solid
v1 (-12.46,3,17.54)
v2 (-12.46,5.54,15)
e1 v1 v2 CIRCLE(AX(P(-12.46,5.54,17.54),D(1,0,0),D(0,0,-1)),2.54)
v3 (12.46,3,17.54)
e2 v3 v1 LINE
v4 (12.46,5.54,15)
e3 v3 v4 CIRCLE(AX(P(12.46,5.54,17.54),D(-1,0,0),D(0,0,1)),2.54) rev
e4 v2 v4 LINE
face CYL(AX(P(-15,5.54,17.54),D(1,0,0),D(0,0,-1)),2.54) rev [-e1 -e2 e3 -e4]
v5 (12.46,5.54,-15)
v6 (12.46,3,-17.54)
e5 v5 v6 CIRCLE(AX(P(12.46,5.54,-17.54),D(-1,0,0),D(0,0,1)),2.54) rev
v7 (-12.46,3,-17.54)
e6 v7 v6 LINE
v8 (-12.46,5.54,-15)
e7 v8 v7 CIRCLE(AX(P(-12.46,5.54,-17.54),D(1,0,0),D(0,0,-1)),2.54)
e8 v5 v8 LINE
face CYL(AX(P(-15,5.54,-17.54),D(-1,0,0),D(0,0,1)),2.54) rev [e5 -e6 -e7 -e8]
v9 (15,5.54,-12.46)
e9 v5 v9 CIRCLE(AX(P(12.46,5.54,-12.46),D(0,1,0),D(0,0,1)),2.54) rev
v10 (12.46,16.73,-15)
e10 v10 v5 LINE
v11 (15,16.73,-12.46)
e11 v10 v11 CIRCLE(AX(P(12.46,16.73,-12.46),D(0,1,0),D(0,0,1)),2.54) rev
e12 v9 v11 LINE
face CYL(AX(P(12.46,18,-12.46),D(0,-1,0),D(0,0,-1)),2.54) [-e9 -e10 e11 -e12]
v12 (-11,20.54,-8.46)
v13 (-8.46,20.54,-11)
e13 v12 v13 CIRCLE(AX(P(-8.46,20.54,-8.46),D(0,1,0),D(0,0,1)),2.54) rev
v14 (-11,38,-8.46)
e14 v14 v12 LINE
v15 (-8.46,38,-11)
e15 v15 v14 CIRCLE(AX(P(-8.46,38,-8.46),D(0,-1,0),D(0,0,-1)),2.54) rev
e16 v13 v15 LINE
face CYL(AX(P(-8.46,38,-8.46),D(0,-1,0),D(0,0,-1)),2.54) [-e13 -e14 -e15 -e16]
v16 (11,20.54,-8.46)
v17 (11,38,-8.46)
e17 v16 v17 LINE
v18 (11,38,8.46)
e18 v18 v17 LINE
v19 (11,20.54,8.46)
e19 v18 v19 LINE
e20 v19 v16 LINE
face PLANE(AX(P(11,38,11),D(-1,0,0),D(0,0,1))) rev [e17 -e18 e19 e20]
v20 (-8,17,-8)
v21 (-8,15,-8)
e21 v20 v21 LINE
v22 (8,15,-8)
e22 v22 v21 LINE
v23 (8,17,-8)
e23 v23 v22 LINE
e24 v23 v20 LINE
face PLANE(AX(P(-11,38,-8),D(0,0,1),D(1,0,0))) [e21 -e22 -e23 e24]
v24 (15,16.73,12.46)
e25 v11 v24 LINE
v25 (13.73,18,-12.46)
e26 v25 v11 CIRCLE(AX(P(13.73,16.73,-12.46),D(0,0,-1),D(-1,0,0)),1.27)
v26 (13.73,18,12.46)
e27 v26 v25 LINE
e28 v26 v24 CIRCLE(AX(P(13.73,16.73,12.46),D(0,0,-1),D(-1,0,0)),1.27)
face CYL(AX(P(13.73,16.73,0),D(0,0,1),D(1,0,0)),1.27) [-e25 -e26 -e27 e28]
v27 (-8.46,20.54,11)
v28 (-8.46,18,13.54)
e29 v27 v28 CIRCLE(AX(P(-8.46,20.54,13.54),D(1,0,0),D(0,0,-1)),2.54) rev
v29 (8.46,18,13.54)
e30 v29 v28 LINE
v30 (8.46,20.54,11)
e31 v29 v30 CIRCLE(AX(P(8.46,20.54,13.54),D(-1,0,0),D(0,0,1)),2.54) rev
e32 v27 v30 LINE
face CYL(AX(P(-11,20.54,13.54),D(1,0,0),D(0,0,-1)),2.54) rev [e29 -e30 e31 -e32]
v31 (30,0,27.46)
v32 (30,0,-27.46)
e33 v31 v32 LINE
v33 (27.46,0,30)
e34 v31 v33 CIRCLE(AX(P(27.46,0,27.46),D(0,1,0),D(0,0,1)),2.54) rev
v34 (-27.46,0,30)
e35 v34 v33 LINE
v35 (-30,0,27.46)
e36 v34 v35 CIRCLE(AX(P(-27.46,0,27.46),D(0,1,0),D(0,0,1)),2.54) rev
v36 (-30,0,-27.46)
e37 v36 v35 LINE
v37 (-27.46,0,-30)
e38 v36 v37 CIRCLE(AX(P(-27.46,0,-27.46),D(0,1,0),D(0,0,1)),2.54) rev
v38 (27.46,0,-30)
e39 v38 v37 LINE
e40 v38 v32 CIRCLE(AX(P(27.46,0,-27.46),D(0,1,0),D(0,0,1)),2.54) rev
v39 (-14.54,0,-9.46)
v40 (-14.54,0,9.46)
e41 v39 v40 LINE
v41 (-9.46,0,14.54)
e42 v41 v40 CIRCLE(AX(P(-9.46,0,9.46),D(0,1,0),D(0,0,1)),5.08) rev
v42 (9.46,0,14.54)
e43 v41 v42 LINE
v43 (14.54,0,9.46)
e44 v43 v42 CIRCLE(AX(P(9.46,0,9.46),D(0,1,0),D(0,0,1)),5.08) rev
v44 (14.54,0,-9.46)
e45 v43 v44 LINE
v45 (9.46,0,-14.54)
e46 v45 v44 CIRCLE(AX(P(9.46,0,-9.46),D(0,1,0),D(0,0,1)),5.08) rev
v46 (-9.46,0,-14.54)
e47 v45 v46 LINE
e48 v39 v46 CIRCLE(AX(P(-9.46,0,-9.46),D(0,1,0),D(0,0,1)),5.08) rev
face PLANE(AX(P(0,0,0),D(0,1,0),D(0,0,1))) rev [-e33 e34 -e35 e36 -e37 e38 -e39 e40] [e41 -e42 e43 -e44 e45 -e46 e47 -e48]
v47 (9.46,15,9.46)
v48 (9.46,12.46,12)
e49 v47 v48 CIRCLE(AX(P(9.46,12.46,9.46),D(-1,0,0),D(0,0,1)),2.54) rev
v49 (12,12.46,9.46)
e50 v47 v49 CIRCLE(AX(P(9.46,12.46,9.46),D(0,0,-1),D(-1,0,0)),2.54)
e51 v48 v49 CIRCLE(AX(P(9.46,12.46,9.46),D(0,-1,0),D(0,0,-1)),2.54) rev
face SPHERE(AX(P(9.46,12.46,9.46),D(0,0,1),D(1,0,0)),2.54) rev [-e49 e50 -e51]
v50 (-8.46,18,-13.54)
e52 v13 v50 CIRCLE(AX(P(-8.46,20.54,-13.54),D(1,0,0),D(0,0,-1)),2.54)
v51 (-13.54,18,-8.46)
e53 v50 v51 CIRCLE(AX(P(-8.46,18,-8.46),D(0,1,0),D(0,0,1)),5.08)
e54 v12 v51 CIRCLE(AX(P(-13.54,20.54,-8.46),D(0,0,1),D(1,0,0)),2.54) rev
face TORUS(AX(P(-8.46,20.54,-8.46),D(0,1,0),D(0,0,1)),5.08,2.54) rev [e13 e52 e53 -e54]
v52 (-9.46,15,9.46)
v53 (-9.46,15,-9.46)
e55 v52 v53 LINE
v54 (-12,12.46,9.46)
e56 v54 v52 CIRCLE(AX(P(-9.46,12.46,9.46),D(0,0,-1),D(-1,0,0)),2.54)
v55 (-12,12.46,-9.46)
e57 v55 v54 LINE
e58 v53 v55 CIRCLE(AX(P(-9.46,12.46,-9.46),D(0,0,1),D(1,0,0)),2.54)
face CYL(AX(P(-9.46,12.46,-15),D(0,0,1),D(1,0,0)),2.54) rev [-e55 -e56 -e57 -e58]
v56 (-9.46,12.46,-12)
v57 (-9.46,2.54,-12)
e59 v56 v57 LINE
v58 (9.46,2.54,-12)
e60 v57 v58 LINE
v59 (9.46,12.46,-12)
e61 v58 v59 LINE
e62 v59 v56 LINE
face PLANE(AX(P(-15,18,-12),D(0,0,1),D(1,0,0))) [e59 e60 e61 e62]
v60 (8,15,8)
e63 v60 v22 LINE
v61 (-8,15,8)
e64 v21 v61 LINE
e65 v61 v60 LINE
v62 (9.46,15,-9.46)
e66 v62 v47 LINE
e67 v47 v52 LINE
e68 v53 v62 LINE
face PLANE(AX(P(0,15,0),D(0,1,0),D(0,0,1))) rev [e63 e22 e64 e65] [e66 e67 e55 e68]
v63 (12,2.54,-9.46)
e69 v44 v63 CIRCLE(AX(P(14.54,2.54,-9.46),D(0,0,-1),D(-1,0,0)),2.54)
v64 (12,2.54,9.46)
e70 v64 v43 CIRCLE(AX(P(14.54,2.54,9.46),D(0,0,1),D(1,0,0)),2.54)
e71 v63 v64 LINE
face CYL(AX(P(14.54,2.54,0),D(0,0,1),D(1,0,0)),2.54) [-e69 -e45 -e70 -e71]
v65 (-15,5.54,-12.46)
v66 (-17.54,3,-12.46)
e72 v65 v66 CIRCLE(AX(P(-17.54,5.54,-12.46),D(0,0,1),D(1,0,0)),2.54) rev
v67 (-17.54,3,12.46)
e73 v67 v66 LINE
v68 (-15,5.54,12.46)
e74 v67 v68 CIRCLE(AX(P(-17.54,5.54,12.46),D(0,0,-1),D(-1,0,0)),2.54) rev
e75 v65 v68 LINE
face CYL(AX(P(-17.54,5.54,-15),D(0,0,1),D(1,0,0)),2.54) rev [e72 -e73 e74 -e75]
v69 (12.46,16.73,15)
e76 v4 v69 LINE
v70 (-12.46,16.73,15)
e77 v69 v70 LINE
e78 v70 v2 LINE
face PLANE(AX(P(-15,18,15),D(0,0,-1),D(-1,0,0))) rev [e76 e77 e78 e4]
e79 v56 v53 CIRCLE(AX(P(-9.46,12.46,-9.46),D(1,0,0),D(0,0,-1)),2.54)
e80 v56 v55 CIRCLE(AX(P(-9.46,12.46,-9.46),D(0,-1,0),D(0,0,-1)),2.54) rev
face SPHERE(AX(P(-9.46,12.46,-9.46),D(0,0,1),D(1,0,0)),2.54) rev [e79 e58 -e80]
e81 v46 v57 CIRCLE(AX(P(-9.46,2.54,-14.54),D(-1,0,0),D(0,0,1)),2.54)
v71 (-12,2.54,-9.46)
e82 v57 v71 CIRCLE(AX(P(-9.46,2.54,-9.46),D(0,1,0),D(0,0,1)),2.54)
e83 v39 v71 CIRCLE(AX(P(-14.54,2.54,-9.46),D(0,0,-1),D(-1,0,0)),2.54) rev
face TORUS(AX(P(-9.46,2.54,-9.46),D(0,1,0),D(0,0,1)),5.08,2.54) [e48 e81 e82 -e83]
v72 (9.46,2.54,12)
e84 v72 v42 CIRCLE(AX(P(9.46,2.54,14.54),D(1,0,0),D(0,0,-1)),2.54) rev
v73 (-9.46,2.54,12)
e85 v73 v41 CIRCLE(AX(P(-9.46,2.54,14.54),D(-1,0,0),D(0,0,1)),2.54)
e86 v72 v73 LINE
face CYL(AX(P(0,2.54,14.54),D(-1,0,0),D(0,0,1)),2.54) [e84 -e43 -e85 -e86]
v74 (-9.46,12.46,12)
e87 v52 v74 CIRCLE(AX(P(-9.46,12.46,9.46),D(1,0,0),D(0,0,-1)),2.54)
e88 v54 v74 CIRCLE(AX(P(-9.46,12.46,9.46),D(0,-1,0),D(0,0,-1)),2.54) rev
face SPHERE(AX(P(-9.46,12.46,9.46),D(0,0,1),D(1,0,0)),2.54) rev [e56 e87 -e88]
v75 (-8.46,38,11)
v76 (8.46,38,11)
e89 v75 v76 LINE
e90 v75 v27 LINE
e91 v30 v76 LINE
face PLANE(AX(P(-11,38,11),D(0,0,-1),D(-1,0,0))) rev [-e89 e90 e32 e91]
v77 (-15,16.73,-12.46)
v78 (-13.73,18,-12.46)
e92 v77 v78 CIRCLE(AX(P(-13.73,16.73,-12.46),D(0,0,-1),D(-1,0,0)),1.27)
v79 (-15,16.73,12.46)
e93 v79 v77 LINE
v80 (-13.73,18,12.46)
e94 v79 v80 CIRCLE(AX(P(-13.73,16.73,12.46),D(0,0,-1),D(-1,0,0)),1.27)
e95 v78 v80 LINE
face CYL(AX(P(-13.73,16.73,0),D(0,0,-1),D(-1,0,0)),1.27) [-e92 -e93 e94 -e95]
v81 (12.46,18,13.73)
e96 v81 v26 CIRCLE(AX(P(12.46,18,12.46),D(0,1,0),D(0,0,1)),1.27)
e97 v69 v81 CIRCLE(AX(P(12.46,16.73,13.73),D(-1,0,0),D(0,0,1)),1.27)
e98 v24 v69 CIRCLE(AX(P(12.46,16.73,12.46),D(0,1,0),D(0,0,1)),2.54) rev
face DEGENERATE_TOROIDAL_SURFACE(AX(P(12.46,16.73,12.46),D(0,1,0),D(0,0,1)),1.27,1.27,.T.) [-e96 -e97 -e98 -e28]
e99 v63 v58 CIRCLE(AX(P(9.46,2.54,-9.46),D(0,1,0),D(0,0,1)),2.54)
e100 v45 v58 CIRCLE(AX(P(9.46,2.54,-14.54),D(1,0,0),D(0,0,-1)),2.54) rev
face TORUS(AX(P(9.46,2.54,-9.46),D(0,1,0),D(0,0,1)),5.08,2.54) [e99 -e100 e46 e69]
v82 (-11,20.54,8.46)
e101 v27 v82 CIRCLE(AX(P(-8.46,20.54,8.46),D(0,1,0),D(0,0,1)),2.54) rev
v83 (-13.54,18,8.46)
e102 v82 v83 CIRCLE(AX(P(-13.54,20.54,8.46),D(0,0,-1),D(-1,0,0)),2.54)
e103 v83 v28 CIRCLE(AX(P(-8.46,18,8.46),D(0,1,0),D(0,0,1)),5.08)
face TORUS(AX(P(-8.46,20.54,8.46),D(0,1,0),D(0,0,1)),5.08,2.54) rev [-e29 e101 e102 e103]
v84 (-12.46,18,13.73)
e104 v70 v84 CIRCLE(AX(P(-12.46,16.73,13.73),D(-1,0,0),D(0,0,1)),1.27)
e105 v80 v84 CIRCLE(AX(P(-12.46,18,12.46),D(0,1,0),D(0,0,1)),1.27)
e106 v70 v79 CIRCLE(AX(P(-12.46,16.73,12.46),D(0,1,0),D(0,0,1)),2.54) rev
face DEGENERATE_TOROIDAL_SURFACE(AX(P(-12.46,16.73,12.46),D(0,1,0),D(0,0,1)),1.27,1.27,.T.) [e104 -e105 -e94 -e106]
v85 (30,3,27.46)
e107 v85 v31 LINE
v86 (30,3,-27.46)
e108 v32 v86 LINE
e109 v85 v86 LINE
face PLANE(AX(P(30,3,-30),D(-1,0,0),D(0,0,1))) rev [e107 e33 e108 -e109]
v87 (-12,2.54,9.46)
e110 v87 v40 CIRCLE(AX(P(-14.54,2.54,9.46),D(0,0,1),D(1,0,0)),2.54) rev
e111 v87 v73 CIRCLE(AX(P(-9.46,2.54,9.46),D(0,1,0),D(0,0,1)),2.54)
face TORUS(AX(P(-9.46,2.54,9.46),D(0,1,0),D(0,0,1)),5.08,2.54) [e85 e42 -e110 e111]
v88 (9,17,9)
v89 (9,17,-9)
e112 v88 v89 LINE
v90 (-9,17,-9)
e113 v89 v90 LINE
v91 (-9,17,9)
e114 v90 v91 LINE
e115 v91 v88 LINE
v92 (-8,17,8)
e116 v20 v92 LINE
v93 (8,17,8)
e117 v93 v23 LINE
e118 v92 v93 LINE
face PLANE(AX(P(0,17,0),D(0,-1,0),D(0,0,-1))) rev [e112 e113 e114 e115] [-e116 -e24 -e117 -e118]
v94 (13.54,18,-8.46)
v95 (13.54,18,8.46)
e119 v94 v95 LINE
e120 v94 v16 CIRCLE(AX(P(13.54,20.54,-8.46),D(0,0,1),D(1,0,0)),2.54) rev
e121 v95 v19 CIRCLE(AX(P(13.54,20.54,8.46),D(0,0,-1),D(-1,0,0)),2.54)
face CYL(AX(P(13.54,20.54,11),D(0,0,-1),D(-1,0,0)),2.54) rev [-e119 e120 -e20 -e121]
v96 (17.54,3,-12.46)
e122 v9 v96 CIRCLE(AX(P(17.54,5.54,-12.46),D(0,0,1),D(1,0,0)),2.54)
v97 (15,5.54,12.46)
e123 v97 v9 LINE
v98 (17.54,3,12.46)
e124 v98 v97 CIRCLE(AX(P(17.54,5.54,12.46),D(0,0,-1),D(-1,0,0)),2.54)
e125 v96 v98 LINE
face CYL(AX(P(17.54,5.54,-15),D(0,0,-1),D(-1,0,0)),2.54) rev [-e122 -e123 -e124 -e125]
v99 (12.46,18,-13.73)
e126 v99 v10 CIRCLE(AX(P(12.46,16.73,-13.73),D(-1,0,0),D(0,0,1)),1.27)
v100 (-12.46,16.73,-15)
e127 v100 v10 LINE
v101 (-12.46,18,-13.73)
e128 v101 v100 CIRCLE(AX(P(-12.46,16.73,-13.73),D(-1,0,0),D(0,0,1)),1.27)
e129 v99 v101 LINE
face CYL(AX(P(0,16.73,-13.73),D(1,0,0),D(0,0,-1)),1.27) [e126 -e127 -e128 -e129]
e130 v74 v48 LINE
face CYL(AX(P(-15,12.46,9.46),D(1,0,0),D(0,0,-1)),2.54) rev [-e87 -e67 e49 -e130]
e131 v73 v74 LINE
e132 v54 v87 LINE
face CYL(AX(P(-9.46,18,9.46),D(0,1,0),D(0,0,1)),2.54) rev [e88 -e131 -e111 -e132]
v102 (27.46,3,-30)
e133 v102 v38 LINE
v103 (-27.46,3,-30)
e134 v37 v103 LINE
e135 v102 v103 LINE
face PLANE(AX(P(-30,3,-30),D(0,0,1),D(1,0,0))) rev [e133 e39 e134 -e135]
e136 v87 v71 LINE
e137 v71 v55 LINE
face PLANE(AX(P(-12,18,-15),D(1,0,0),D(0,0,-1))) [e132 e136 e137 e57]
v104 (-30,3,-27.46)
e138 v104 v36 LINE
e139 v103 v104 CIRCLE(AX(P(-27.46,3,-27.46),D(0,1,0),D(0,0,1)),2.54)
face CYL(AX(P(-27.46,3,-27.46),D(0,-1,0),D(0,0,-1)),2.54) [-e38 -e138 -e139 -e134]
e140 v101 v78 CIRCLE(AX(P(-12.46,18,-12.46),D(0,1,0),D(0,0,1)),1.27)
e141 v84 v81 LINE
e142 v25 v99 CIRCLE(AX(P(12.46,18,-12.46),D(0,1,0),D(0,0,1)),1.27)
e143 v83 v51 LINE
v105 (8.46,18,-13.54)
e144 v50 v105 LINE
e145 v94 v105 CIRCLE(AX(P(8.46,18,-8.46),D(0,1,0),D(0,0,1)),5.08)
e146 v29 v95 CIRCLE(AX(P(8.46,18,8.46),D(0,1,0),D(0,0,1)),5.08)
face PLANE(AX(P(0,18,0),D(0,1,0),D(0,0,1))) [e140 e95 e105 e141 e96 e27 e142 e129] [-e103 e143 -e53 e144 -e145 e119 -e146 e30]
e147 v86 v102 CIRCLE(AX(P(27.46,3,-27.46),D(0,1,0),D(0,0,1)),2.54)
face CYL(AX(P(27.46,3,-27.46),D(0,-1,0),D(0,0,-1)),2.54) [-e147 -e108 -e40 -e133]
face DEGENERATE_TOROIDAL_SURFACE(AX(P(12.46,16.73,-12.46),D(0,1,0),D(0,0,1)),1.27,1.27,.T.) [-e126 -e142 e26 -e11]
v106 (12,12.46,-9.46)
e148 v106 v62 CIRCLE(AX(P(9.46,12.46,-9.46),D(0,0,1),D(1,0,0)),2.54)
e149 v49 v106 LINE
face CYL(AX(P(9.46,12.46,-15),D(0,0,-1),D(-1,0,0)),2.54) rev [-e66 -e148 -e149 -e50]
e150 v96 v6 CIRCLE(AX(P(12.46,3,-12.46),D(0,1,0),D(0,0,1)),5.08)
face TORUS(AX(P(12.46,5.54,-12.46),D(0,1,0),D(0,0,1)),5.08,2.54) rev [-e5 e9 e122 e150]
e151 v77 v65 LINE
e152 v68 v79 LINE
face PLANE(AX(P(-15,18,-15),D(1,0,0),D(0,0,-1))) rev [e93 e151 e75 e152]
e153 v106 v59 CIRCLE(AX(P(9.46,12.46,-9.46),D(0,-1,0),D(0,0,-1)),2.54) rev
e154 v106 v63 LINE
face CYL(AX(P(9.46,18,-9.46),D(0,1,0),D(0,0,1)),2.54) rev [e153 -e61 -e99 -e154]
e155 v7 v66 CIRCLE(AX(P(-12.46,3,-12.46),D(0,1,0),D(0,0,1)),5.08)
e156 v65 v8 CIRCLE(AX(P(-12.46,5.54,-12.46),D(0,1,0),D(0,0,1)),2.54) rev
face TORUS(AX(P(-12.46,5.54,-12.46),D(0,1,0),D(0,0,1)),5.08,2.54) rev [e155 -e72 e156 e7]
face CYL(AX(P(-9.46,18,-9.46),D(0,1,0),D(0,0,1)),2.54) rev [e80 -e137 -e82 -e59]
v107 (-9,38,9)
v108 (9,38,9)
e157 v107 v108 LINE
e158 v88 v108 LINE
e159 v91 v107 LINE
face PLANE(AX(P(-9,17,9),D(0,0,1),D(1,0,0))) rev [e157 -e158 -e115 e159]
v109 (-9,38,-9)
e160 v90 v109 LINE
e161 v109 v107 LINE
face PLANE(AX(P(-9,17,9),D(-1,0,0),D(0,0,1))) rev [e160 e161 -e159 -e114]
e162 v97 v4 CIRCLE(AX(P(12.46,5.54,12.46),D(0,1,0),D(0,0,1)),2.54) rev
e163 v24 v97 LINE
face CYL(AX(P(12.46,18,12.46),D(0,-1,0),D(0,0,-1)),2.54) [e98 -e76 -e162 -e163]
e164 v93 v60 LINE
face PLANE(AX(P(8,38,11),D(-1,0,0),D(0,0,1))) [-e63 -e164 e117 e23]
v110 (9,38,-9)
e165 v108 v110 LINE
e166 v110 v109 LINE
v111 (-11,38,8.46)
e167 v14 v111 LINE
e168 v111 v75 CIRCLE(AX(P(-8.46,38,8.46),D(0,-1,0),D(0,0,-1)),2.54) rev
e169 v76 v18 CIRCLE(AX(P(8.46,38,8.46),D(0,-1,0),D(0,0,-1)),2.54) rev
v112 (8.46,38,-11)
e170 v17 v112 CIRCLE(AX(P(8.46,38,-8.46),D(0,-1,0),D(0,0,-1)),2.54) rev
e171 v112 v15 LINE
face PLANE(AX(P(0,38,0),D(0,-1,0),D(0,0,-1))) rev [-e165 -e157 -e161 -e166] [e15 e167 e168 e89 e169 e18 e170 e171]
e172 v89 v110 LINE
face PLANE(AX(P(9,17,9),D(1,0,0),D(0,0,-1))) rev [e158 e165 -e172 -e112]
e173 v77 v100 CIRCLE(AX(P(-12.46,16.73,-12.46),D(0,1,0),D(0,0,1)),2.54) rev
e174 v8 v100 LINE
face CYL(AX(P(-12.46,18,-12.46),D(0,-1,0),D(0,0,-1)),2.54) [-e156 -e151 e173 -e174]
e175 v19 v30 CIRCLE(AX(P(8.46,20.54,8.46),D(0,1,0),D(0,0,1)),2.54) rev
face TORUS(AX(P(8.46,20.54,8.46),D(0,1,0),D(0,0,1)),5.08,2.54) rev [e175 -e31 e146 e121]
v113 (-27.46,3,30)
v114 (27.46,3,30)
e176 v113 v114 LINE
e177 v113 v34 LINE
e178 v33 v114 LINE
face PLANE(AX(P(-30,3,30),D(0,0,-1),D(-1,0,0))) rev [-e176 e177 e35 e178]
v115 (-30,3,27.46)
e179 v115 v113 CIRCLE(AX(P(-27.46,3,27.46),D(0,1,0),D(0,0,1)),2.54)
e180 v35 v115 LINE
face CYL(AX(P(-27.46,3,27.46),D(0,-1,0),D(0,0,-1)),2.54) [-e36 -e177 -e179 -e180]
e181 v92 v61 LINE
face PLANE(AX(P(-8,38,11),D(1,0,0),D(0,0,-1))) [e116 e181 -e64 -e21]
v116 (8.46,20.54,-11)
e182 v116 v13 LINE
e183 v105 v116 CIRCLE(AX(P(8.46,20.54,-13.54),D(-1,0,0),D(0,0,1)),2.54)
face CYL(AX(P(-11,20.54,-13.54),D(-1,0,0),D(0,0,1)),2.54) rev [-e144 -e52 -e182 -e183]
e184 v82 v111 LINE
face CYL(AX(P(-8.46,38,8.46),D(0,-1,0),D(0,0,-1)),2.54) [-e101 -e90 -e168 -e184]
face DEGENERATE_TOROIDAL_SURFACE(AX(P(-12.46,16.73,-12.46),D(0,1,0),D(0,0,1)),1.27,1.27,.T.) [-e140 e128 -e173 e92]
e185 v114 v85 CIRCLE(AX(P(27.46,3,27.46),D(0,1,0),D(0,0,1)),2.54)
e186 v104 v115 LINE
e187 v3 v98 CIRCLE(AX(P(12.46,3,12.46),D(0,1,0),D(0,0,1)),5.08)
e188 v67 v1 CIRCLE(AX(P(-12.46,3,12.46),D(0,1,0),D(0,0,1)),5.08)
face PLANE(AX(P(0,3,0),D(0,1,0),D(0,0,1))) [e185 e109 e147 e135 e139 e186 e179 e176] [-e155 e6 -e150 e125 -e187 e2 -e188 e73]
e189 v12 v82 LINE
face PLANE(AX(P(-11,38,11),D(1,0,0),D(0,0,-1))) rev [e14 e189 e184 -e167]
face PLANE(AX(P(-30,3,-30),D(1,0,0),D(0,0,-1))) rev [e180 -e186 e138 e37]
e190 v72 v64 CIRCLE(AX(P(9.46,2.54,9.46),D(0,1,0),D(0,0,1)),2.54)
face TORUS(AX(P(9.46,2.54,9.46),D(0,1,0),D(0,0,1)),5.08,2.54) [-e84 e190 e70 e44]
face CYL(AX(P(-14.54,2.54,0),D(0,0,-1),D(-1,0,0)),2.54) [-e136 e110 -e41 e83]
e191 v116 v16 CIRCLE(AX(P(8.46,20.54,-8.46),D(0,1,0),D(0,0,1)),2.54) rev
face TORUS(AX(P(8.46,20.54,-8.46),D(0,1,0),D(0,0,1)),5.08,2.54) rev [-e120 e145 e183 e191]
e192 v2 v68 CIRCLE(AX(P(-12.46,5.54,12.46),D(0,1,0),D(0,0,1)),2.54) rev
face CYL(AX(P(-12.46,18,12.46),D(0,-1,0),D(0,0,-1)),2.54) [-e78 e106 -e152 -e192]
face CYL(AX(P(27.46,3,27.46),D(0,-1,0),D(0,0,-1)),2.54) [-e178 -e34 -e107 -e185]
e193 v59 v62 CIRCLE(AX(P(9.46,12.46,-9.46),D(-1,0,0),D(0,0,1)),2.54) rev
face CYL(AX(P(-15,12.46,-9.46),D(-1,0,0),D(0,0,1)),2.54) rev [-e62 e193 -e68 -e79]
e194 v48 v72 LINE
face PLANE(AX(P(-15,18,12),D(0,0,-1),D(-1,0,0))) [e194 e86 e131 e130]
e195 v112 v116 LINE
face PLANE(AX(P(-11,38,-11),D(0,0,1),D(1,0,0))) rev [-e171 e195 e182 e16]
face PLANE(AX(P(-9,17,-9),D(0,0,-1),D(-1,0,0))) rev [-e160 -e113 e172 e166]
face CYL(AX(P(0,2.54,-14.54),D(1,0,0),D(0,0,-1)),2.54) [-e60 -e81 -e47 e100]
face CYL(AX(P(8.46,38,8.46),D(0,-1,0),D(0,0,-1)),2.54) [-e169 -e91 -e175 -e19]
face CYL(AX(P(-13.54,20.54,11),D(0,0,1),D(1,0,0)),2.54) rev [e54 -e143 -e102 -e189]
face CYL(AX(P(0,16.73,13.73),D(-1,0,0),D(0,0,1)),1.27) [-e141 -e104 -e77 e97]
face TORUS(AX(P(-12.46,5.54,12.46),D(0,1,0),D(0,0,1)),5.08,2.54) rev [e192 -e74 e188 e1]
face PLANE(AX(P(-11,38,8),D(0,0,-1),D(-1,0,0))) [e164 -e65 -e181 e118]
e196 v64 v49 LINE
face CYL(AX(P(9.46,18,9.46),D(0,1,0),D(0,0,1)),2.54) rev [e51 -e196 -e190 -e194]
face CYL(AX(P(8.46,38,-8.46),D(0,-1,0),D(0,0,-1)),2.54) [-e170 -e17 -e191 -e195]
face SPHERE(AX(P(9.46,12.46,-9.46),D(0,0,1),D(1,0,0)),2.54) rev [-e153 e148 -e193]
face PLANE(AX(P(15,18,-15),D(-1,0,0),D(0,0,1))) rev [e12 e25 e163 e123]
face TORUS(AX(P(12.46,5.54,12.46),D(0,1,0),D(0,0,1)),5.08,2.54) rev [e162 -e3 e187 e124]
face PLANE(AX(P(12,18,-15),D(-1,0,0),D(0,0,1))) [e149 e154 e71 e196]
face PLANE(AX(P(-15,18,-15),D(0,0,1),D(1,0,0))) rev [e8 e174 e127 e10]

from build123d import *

# Parameters (mm, degrees)
SKETCH1_W           = 60
SKETCH1_H           = 60
BOSS_EXTRUDE1_DEPTH = 3
SKETCH2_W           = 30
SKETCH2_H           = 30
BOSS_EXTRUDE2_DEPTH = 14.999999878
SKETCH3_W           = 22
SKETCH3_H           = 22
BOSS_EXTRUDE3_DEPTH = 19.999999944
SHELL1_START        = -8
SHELL1_DEPTH        = 16
SHELL1_START_2      = -12
SHELL1_2_OUTLINE_W  = 14.999999878
SHELL1_2_OUTLINE_H  = 24
SHELL1_2_DEPTH      = 24
SKETCH4_W           = 16
SKETCH4_H           = 16
CUT_EXTRUDE1_DEPTH  = 55.999999887
SKETCH5_W           = 18
SKETCH5_H           = 18
SKETCH5_W_2         = 16
SKETCH5_H_2         = 16
CUT_EXTRUDE2_DEPTH  = 21.000000066
FILLET2_R           = 2.54
FILLET3_R           = 2.54
FILLET4_R           = 1.27


# Read off the part's stored shape, not the designer's step: Shell1
with BuildPart() as part:
    # Sketch1 → Boss-Extrude1 (new body)
    with BuildSketch(Plane(origin=(0, 0, 0), x_dir=(1, 0, 0), z_dir=(0, 1, 0))):
        Rectangle(SKETCH1_W, SKETCH1_H)
    extrude(amount=BOSS_EXTRUDE1_DEPTH)

    # Sketch2 → Boss-Extrude2 (add)
    with BuildSketch(Plane(origin=(0, 3, 0), x_dir=(1, 0, 0), z_dir=(0, 1, 0))):
        Rectangle(SKETCH2_W, SKETCH2_H)
    extrude(amount=BOSS_EXTRUDE2_DEPTH)

    # Sketch3 → Boss-Extrude3 (add)
    with BuildSketch(Plane(origin=(0, 17.999999878, 0), x_dir=(1, 0, 0), z_dir=(0, 1, 0))):
        Rectangle(SKETCH3_W, SKETCH3_H)
    extrude(amount=BOSS_EXTRUDE3_DEPTH)

    # Shell1 outline → Shell1 (cut)
    with BuildSketch(Plane.YZ.offset(SHELL1_START)):
        Polygon((14.999999878, 12), (0, 12), (0, -12), (14.999999878, -12), (14.999999878, -8), (34.999999822, -8), (34.999999822, 8), (14.999999878, 8), align=None)
    extrude(amount=SHELL1_DEPTH, mode=Mode.SUBTRACT)

    # Shell1 2 outline → Shell1 2 (cut)
    with BuildSketch(Plane.YZ.offset(SHELL1_START_2)):
        with Locations((7.499999939, 0)):
            Rectangle(SHELL1_2_OUTLINE_W, SHELL1_2_OUTLINE_H)
    extrude(amount=SHELL1_2_DEPTH, mode=Mode.SUBTRACT)

    # Sketch4 → Cut-Extrude1 (cut, through all)
    with BuildSketch(Plane.XZ.offset(-34.999999822)):
        Rectangle(SKETCH4_W, SKETCH4_H)
    extrude(amount=-CUT_EXTRUDE1_DEPTH, mode=Mode.SUBTRACT)

    # Sketch5 → Cut-Extrude2 (cut)
    with BuildSketch(Plane(origin=(0, 37.999999822, 0), x_dir=(1, 0, 0), z_dir=(0, 1, 0))):
        Rectangle(SKETCH5_W, SKETCH5_H)
        Rectangle(SKETCH5_W_2, SKETCH5_H_2, mode=Mode.SUBTRACT)
    extrude(amount=-CUT_EXTRUDE2_DEPTH, mode=Mode.SUBTRACT)

    # Fillet2
    fillet2_edges = [part.edges().sort_by_distance(p)[0] for p in [
        (-12, 0, 0),
        (-12, 7.499999939, -12),
        (0, 0, 12),
        (-12, 7.499999939, 12),
        (12, 0, 0),
        (12, 7.499999939, 12),
        (0, 0, -12),
        (12, 7.499999939, -12),
        (-12, 14.999999878, 0),
        (0, 14.999999878, 12),
        (12, 14.999999878, 0),
        (0, 14.999999878, -12),
    ]]
    fillet(fillet2_edges, radius=FILLET2_R)

    # Fillet3
    fillet3_edges = [part.edges().sort_by_distance(p)[0] for p in [
        (-15, 10.499999939, -15),
        (-15, 10.499999939, 15),
        (15, 10.499999939, 15),
        (15, 10.499999939, -15),
        (-11, 27.99999985, -11),
        (-11, 27.99999985, 11),
        (11, 27.99999985, 11),
        (11, 27.99999985, -11),
        (-30, 1.5, -30),
        (30, 1.5, -30),
        (30, 1.5, 30),
        (-30, 1.5, 30),
    ]]
    fillet(fillet3_edges, radius=FILLET3_R)
    fillet3_2_edges = [part.edges().sort_by_distance(p)[0] for p in [
        (-15, 3, 0),
        (0, 3, 15),
        (15, 3, 0),
        (0, 3, -15),
        (-11, 17.999999878, 0),
        (0, 17.999999878, 11),
        (11, 17.999999878, 0),
        (0, 17.999999878, -11),
        (10.256051224, 17.999999878, -10.256051224),
        (-10.256051224, 17.999999878, -10.256051224),
        (10.256051224, 17.999999878, 10.256051224),
        (-10.256051224, 17.999999878, 10.256051224),
        (-14.256051224, 3, -14.256051224),
        (14.256051224, 3, -14.256051224),
        (14.256051224, 3, 14.256051224),
        (-14.256051224, 3, 14.256051224),
    ]]
    fillet(fillet3_2_edges, radius=FILLET3_R)

    # Fillet4
    fillet4_edges = [part.edges().sort_by_distance(p)[0] for p in [
        (-15, 17.999999878, 0),
        (0, 17.999999878, 15),
        (15, 17.999999878, 0),
        (0, 17.999999878, -15),
        (-14.256051224, 17.999999878, -14.256051224),
        (-14.256051224, 17.999999878, 14.256051224),
        (14.256051224, 17.999999878, 14.256051224),
        (14.256051224, 17.999999878, -14.256051224),
    ]]
    fillet(fillet4_edges, radius=FILLET4_R)


solid = part.part
